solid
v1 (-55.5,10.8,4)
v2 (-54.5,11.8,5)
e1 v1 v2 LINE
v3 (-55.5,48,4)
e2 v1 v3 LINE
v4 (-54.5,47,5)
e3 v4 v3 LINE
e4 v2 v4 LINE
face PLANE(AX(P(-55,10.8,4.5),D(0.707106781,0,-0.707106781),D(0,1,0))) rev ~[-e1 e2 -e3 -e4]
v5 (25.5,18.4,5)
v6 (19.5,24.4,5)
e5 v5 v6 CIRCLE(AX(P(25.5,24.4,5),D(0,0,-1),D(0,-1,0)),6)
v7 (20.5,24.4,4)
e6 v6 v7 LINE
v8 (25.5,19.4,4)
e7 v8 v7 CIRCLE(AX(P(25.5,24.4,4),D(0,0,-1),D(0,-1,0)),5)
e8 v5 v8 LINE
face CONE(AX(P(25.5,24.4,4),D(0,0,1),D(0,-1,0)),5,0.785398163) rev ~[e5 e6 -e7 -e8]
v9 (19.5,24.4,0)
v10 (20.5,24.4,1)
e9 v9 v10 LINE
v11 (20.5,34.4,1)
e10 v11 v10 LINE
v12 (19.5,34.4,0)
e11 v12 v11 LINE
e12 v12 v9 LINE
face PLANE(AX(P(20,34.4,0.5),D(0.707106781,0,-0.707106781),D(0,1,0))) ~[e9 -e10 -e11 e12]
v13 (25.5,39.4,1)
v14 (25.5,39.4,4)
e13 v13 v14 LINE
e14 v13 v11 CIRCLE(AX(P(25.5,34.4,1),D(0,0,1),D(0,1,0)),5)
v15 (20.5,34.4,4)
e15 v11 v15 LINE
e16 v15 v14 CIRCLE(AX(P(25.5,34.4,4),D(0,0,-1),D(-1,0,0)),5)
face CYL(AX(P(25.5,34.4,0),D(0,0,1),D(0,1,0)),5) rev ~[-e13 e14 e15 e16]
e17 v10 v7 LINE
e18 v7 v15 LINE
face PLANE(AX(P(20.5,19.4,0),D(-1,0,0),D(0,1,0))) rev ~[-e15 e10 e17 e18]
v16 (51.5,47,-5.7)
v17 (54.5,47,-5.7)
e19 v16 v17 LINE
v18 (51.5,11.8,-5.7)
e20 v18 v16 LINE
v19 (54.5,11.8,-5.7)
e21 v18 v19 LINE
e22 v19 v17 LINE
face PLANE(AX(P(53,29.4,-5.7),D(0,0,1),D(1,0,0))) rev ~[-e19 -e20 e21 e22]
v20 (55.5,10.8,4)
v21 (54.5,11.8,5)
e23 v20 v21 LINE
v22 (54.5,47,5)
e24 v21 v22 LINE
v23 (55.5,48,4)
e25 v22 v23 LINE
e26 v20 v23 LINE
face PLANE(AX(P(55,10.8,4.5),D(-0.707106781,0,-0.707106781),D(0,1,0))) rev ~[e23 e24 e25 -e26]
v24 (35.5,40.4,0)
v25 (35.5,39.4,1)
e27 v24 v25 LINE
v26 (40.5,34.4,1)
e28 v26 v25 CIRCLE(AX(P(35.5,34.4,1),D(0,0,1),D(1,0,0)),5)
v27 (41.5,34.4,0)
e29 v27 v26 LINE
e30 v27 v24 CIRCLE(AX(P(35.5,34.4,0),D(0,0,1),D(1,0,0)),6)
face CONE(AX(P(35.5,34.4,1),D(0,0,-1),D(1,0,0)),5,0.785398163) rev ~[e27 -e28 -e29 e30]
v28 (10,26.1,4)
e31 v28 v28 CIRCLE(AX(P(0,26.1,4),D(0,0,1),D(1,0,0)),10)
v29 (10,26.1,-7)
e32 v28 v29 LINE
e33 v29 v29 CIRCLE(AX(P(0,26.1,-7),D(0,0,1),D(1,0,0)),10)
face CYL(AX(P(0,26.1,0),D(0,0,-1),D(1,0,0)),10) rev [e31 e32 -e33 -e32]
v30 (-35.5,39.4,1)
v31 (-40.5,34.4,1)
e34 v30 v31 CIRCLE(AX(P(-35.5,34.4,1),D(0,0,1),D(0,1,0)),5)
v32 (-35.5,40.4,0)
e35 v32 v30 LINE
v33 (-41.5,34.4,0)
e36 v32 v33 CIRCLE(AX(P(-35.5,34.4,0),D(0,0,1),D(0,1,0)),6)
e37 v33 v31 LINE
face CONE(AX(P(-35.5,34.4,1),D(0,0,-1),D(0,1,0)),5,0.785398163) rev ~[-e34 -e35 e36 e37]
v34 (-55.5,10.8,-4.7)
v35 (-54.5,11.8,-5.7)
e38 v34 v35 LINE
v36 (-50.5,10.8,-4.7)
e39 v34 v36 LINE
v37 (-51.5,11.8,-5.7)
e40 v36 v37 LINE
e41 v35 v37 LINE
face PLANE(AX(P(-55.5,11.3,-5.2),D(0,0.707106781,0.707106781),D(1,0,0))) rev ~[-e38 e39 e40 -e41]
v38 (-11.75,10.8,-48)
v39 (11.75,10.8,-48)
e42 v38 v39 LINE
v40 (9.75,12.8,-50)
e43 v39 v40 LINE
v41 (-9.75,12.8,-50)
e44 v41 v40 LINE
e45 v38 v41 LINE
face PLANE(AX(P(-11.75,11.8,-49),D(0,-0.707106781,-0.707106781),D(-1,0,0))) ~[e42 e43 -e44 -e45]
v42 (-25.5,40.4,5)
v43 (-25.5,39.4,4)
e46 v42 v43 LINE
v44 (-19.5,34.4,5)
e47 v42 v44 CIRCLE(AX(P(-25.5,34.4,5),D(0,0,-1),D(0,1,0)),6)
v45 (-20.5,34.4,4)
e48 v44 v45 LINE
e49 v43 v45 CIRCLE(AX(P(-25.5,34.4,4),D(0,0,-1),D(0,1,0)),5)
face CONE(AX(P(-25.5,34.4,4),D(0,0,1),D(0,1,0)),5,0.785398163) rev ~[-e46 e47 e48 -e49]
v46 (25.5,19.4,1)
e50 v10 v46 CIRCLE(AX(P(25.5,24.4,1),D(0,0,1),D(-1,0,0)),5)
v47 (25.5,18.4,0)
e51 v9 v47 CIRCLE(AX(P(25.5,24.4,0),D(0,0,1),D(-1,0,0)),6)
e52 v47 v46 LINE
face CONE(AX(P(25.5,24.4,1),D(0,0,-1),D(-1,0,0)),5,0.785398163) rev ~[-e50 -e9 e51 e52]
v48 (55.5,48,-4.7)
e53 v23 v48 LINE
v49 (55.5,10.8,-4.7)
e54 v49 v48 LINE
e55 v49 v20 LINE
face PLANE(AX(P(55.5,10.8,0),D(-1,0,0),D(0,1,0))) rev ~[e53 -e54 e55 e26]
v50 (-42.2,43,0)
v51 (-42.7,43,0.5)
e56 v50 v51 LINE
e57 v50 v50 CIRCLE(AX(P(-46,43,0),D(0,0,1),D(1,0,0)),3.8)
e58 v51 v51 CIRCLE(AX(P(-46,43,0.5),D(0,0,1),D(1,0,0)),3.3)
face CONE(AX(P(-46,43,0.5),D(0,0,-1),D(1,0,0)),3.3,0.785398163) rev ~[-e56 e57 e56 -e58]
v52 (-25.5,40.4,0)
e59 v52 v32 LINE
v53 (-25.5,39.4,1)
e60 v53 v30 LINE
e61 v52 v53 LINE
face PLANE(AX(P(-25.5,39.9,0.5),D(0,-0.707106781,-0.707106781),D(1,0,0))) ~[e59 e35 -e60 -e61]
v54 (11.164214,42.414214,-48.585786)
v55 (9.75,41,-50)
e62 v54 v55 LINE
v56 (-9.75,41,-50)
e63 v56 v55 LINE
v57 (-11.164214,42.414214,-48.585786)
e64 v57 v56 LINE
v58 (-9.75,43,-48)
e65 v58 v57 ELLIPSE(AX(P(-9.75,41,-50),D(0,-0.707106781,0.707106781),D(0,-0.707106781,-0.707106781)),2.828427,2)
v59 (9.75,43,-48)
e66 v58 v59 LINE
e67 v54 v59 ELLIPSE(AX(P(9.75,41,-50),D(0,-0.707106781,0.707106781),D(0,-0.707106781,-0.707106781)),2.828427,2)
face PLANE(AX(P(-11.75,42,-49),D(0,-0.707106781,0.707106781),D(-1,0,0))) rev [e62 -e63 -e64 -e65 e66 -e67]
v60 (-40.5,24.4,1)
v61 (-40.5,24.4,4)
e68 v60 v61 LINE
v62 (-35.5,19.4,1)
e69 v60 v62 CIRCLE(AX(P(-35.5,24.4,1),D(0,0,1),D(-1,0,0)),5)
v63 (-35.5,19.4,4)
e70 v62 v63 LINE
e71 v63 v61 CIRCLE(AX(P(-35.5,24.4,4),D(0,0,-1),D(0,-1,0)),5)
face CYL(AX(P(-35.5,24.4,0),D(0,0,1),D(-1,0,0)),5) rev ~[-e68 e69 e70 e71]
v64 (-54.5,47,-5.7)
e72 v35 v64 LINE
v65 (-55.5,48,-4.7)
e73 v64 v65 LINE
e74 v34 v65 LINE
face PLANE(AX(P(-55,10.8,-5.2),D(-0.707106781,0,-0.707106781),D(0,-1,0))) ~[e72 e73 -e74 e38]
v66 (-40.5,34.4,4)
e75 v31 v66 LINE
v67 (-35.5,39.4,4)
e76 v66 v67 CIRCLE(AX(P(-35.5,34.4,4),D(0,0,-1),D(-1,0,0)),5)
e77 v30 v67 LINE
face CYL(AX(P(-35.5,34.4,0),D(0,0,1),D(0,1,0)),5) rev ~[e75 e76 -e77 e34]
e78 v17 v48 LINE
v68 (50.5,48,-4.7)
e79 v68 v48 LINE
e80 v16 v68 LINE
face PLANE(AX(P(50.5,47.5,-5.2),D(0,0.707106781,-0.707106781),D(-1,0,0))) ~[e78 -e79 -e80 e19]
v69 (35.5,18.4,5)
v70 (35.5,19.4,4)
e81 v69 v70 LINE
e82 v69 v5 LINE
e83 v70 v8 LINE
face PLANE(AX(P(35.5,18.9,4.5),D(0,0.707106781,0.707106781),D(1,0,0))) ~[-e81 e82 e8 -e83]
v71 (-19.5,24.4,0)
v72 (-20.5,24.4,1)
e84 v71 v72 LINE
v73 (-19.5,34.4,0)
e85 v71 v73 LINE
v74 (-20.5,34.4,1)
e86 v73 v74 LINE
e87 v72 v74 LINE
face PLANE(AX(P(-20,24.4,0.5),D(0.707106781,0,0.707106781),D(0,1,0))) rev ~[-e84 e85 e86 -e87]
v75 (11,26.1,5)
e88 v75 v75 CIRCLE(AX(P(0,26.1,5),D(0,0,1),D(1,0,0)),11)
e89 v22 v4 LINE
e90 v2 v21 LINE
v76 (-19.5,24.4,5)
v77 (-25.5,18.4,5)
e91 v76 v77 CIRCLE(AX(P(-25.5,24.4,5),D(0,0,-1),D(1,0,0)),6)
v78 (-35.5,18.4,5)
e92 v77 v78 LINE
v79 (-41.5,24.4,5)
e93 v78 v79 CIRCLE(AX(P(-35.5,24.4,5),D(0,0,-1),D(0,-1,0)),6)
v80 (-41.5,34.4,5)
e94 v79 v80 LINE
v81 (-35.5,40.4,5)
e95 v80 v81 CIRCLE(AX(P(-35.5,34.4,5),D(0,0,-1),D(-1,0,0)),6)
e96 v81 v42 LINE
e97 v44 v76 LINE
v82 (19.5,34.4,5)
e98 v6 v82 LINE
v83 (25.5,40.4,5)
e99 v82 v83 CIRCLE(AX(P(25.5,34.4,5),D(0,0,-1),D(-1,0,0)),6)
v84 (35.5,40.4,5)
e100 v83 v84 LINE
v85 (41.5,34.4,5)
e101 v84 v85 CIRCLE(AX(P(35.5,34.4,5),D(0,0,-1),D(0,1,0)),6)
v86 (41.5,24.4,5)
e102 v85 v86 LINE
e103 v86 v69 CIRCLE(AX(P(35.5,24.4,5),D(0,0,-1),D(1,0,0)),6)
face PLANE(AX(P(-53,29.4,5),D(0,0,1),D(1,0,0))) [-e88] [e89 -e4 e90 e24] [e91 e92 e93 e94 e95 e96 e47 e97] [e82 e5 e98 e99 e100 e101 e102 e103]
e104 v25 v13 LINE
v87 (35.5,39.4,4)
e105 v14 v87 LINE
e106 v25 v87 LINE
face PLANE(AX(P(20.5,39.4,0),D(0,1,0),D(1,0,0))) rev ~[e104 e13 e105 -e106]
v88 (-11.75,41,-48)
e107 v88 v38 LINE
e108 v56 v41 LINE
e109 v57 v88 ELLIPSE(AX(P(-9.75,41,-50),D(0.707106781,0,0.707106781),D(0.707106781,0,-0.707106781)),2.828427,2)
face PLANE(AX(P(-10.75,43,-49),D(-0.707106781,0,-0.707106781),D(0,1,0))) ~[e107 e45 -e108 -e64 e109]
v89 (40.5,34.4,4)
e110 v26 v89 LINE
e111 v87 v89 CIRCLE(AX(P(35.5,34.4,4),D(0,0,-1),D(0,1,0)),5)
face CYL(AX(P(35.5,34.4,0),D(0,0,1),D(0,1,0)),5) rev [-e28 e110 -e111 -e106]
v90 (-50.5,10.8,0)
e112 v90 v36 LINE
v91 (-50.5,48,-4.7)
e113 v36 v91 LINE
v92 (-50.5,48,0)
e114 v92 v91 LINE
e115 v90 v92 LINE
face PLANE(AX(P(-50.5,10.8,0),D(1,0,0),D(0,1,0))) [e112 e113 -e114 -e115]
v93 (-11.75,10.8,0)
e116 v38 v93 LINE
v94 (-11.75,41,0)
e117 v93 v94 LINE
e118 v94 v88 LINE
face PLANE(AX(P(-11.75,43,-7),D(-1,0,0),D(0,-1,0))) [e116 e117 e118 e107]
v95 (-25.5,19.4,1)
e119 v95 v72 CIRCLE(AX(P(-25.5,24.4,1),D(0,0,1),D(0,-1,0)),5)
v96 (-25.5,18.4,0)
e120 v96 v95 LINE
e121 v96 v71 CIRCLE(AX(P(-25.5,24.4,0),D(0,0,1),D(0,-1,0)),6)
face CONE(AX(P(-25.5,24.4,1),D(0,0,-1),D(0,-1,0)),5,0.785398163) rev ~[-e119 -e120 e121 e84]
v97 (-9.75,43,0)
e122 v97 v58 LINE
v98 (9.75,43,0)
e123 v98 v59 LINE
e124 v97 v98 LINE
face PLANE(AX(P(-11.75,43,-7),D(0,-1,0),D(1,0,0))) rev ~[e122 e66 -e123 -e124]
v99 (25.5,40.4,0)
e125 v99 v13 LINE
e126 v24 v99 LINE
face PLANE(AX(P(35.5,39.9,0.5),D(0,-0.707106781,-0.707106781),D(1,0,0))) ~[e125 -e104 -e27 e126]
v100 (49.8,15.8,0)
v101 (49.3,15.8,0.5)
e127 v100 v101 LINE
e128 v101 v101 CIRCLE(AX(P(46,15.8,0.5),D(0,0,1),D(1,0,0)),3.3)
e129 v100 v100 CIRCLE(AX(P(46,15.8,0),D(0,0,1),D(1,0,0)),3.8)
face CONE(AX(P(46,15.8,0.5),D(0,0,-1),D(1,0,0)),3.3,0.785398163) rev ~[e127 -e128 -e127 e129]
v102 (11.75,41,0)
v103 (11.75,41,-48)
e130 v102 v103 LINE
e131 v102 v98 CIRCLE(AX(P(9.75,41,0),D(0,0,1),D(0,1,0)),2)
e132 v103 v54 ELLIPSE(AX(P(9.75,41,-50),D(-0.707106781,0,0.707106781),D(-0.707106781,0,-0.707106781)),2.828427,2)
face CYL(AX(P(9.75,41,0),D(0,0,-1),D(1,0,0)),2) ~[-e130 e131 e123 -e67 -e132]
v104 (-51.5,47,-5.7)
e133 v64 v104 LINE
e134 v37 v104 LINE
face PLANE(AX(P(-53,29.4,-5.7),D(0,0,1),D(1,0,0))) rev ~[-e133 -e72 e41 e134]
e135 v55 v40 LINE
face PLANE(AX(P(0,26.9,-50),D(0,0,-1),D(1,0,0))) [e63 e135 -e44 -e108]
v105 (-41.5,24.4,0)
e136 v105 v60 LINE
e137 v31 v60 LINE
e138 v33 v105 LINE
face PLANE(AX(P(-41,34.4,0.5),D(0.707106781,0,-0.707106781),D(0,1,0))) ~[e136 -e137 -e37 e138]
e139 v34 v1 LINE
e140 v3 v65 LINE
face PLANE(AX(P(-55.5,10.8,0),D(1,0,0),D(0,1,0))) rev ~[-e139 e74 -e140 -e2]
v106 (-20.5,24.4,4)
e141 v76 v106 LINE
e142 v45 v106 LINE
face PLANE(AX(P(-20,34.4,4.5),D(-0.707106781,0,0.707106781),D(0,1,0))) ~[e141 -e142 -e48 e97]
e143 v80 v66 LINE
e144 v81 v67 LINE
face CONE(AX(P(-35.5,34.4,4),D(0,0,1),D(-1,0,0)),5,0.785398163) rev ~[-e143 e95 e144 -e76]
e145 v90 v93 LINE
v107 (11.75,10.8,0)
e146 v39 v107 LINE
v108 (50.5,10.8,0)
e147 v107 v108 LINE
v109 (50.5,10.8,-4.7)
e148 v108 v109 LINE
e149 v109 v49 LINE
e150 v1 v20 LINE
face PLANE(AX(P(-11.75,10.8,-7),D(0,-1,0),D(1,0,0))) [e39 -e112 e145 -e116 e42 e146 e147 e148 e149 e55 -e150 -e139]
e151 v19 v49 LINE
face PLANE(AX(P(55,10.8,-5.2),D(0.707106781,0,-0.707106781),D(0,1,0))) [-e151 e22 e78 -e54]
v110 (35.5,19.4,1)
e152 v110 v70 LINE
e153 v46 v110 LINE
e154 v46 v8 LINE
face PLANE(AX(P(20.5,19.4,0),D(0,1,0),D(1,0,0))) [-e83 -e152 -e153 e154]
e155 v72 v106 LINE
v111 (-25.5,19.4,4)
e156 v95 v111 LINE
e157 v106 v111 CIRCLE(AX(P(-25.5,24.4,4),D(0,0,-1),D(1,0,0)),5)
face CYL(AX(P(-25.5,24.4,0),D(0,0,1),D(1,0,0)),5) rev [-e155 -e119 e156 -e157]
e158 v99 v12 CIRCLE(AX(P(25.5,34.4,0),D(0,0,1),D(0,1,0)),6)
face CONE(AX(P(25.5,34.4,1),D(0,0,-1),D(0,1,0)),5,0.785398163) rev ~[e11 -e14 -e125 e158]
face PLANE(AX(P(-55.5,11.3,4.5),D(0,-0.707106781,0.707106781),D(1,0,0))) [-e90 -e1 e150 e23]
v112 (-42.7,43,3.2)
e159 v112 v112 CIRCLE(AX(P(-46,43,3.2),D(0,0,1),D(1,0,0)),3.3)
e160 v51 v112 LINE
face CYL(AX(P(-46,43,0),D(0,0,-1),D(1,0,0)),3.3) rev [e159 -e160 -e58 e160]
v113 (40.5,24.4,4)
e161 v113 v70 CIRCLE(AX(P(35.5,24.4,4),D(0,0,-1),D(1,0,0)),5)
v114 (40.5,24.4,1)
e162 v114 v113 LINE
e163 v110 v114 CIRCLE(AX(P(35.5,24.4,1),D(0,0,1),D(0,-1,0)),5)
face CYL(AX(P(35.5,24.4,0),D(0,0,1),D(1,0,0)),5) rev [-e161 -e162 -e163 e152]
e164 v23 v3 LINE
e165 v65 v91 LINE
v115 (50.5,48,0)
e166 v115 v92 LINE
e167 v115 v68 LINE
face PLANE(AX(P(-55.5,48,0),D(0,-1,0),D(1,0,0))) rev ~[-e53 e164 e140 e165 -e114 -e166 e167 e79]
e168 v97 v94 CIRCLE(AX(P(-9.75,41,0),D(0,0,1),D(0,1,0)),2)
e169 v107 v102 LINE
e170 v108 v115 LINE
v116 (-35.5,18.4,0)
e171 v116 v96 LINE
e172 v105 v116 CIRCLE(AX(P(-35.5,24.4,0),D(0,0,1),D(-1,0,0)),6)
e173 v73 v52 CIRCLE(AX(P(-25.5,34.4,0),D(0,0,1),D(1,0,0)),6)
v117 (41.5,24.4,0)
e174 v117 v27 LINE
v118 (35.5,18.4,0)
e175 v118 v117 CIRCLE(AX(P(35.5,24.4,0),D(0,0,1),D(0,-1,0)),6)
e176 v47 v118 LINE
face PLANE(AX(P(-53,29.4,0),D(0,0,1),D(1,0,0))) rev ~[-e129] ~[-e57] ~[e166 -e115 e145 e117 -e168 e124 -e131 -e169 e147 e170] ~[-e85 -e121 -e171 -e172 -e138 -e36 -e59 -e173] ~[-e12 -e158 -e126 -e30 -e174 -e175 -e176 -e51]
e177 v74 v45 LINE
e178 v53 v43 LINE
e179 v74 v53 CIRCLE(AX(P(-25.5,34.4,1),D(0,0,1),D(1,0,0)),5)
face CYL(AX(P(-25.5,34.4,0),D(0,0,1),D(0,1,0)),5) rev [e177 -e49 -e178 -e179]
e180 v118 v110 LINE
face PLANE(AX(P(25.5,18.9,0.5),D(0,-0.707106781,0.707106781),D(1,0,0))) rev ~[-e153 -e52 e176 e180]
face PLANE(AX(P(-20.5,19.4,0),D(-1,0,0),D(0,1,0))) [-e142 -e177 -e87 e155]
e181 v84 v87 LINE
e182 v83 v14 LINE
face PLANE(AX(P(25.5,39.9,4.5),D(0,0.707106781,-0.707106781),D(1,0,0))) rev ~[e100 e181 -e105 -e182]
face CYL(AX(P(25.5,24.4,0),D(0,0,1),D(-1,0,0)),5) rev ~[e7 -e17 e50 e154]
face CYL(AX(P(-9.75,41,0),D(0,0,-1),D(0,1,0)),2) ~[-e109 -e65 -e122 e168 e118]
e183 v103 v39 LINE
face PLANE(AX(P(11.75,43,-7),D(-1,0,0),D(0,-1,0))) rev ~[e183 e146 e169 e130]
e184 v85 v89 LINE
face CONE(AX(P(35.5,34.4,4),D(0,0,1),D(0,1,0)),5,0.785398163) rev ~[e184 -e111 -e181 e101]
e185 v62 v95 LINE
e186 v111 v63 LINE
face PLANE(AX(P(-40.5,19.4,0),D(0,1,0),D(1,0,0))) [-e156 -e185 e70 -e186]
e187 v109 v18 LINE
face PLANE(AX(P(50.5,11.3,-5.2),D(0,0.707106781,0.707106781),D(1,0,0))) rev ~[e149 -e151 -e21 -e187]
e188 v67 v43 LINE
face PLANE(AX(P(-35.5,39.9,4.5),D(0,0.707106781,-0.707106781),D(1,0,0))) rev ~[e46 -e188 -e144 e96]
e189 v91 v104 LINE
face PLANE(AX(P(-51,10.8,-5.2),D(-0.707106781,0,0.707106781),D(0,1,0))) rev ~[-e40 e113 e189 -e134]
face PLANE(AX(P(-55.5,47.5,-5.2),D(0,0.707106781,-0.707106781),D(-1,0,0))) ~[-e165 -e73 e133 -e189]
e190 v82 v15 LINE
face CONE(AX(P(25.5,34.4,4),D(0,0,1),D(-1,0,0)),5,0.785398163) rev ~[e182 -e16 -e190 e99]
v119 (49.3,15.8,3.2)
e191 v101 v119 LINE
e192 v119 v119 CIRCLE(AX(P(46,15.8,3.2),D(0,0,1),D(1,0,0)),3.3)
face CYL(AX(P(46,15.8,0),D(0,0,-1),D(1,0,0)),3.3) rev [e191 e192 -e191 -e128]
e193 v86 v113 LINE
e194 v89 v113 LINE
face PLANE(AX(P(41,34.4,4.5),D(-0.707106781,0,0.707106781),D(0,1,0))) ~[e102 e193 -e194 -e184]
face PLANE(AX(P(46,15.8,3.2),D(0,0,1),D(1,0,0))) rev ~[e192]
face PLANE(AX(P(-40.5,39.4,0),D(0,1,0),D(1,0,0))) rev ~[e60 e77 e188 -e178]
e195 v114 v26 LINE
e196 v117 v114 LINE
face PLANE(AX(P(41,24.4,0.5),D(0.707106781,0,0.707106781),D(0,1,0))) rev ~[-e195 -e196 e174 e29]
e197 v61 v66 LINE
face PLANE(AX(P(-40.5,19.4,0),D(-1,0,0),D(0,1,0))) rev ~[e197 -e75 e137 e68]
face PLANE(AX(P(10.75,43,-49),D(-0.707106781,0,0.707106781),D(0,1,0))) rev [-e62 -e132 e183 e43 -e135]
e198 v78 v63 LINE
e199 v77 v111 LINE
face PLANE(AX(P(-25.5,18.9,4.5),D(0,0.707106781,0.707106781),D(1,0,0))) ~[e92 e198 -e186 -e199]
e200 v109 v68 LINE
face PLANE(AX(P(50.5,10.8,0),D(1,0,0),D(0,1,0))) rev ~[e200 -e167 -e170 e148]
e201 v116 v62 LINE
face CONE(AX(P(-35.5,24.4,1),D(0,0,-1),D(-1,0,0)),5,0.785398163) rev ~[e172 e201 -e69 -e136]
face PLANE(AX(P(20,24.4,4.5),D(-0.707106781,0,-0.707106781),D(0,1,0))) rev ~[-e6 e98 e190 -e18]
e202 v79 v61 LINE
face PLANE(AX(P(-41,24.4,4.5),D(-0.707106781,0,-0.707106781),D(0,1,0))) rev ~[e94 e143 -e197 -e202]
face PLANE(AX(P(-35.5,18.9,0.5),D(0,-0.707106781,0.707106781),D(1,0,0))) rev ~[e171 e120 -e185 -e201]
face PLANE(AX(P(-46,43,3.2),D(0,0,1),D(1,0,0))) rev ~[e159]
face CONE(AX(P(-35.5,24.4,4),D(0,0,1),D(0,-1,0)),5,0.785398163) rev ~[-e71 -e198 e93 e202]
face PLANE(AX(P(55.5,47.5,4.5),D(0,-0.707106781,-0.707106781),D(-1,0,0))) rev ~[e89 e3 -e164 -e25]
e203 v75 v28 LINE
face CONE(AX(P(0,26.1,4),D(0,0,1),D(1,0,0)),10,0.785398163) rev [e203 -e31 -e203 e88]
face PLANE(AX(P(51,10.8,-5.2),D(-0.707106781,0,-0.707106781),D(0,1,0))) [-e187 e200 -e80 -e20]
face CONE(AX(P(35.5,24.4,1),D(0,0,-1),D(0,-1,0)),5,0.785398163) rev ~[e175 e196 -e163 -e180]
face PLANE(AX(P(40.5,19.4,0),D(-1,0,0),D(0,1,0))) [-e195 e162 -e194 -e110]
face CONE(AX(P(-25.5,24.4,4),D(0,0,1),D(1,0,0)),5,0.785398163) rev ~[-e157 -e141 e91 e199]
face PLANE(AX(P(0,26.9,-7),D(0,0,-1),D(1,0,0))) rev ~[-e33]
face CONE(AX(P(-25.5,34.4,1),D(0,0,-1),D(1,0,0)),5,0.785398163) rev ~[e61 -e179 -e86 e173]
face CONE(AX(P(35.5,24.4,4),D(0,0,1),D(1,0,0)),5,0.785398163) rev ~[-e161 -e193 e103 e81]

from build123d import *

# Parameters (mm, degrees)
F0_W      = 5
F0_H      = 37.2
F0_W_2    = 20
F0_H_2    = 20
F0_W_3    = 23.5
F0_H_3    = 32.2
F0_R      = 10
F1_DEPTH  = 5
F2_DEPTH  = 5.7
F3_DEPTH  = 7
F4_W      = 23.5
F4_H      = 32.2
F4_R      = 10
F5_DEPTH  = 43
F6_R      = 5
F7_SIZE   = 2
F8_SIZE   = 1
F9_SIZE   = 1
F10_SIZE  = 1
F11_R     = 2
F12_R     = 3.3
F13_DEPTH = 3.2
F14_SIZE  = 0.5


with BuildPart() as f1:
    # F0 (on Top) → F1 (new body)
    with BuildSketch(Plane.XY):
        with Locations((-53, 29.4)):
            Rectangle(F0_W, F0_H)
        Polygon((-50.5, 48), (-50.5, 10.8), (-11.75, 10.8), (-11.75, 43), (11.75, 43), (11.75, 10.8), (50.5, 10.8), (50.5, 48), (5, 48), (-5, 48), align=None)
        with Locations((-30.5, 29.4)):
            Rectangle(F0_W_2, F0_H_2, mode=Mode.SUBTRACT)
        with Locations((30.5, 29.4)):
            Rectangle(F0_W_2, F0_H_2, mode=Mode.SUBTRACT)
        with Locations((0, 26.9)):
            Rectangle(F0_W_3, F0_H_3)
        with Locations((0, 26.1)):
            Circle(F0_R, mode=Mode.SUBTRACT)
        with Locations((53, 29.4)):
            Rectangle(F0_W, F0_H)
    extrude(amount=F1_DEPTH)

    # F0 (on Top) → F2 (join)
    with BuildSketch(Plane.XY):
        with Locations((-53, 29.4)):
            Rectangle(F0_W, F0_H)
        with Locations((53, 29.4)):
            Rectangle(F0_W, F0_H)
    extrude(amount=-F2_DEPTH)

    # F0 (on Top) → F3 (join)
    with BuildSketch(Plane.XY):
        with Locations((0, 26.9)):
            Rectangle(F0_W_3, F0_H_3)
        with Locations((0, 26.1)):
            Circle(F0_R, mode=Mode.SUBTRACT)
    extrude(amount=-F3_DEPTH)

    # F4 (on face) → F5 (join)
    with BuildSketch(Plane(origin=(0, 0, -7), x_dir=(1, 0, 0), z_dir=(0, 0, -1))):
        with Locations((0, -26.9)):
            Rectangle(F4_W, F4_H)
        with Locations((0, -26.1)):
            Circle(F4_R, mode=Mode.SUBTRACT)
        with Locations((0, -26.1)):
            Circle(F4_R)
    extrude(amount=F5_DEPTH)

    # F6
    f6_edges = [f1.edges().sort_by_distance(p)[0] for p in [
        (20.5, 39.4, 2.5),
        (40.5, 39.4, 2.5),
        (20.5, 19.4, 2.5),
        (40.5, 19.4, 2.5),
        (-20.5, 39.4, 2.5),
        (-40.5, 39.4, 2.5),
        (-40.5, 19.4, 2.5),
        (-20.5, 19.4, 2.5),
    ]]
    fillet(f6_edges, radius=F6_R)

    # F7
    f7_edges = [f1.edges().sort_by_distance(p)[0] for p in [
        (0, 10.8, -50),
        (-11.75, 26.9, -50),
        (0, 43, -50),
        (11.75, 26.9, -50),
    ]]
    chamfer(f7_edges, length=F7_SIZE)

    # F8
    f8_edges = [f1.edges().sort_by_distance(p)[0] for p in [
        (55.5, 29.4, -5.7),
        (53, 48, -5.7),
        (50.5, 29.4, -5.7),
        (53, 10.8, -5.7),
        (-53, 10.8, -5.7),
        (-50.5, 29.4, -5.7),
        (-53, 48, -5.7),
        (-55.5, 29.4, -5.7),
    ]]
    chamfer(f8_edges, length=F8_SIZE)

    # F9
    f9_edges = [f1.edges().sort_by_distance(p)[0] for p in [
        (-10, 26.1, 5),
        (20.5, 29.4, 5),
        (21.964466, 20.864466, 5),
        (21.964466, 37.935534, 5),
        (30.5, 19.4, 5),
        (30.5, 39.4, 5),
        (39.035534, 20.864466, 5),
        (39.035534, 37.935534, 5),
        (40.5, 29.4, 5),
        (0, 10.8, 5),
        (55.5, 29.4, 5),
        (0, 48, 5),
        (-55.5, 29.4, 5),
        (-40.5, 29.4, 5),
        (-39.035534, 20.864466, 5),
        (-39.035534, 37.935534, 5),
        (-30.5, 19.4, 5),
        (-30.5, 39.4, 5),
        (-21.964466, 20.864466, 5),
        (-21.964466, 37.935534, 5),
        (-20.5, 29.4, 5),
    ]]
    chamfer(f9_edges, length=F9_SIZE)

    # F10
    f10_edges = [f1.edges().sort_by_distance(p)[0] for p in [
        (-30.5, 19.4, 0),
        (-20.5, 29.4, 0),
        (-30.5, 39.4, 0),
        (-40.5, 29.4, 0),
        (30.5, 19.4, 0),
        (20.5, 29.4, 0),
        (30.5, 39.4, 0),
        (40.5, 29.4, 0),
        (-39.035534, 20.864466, 0),
        (-39.035534, 37.935534, 0),
        (-21.964466, 20.864466, 0),
        (-21.964466, 37.935534, 0),
        (21.964466, 20.864466, 0),
        (21.964466, 37.935534, 0),
        (39.035534, 20.864466, 0),
        (39.035534, 37.935534, 0),
    ]]
    chamfer(f10_edges, length=F10_SIZE)

    # F11
    f11_edges = [f1.edges().sort_by_distance(p)[0] for p in [
        (-11.75, 43, -24),
        (11.75, 43, -24),
    ]]
    fillet(f11_edges, radius=F11_R)

    # F12 (on face) → F13 (cut)
    with BuildSketch(Plane.XY):
        with Locations((-46, 43)):
            Circle(F12_R)
        with Locations((46, 15.8)):
            Circle(F12_R)
    extrude(amount=F13_DEPTH, mode=Mode.SUBTRACT)

    # F14
    f14_edges = [f1.edges().sort_by_distance(p)[0] for p in [
        (-49.3, 43, 0),
        (42.7, 15.8, 0),
    ]]
    chamfer(f14_edges, length=F14_SIZE)


solid = f1.part
